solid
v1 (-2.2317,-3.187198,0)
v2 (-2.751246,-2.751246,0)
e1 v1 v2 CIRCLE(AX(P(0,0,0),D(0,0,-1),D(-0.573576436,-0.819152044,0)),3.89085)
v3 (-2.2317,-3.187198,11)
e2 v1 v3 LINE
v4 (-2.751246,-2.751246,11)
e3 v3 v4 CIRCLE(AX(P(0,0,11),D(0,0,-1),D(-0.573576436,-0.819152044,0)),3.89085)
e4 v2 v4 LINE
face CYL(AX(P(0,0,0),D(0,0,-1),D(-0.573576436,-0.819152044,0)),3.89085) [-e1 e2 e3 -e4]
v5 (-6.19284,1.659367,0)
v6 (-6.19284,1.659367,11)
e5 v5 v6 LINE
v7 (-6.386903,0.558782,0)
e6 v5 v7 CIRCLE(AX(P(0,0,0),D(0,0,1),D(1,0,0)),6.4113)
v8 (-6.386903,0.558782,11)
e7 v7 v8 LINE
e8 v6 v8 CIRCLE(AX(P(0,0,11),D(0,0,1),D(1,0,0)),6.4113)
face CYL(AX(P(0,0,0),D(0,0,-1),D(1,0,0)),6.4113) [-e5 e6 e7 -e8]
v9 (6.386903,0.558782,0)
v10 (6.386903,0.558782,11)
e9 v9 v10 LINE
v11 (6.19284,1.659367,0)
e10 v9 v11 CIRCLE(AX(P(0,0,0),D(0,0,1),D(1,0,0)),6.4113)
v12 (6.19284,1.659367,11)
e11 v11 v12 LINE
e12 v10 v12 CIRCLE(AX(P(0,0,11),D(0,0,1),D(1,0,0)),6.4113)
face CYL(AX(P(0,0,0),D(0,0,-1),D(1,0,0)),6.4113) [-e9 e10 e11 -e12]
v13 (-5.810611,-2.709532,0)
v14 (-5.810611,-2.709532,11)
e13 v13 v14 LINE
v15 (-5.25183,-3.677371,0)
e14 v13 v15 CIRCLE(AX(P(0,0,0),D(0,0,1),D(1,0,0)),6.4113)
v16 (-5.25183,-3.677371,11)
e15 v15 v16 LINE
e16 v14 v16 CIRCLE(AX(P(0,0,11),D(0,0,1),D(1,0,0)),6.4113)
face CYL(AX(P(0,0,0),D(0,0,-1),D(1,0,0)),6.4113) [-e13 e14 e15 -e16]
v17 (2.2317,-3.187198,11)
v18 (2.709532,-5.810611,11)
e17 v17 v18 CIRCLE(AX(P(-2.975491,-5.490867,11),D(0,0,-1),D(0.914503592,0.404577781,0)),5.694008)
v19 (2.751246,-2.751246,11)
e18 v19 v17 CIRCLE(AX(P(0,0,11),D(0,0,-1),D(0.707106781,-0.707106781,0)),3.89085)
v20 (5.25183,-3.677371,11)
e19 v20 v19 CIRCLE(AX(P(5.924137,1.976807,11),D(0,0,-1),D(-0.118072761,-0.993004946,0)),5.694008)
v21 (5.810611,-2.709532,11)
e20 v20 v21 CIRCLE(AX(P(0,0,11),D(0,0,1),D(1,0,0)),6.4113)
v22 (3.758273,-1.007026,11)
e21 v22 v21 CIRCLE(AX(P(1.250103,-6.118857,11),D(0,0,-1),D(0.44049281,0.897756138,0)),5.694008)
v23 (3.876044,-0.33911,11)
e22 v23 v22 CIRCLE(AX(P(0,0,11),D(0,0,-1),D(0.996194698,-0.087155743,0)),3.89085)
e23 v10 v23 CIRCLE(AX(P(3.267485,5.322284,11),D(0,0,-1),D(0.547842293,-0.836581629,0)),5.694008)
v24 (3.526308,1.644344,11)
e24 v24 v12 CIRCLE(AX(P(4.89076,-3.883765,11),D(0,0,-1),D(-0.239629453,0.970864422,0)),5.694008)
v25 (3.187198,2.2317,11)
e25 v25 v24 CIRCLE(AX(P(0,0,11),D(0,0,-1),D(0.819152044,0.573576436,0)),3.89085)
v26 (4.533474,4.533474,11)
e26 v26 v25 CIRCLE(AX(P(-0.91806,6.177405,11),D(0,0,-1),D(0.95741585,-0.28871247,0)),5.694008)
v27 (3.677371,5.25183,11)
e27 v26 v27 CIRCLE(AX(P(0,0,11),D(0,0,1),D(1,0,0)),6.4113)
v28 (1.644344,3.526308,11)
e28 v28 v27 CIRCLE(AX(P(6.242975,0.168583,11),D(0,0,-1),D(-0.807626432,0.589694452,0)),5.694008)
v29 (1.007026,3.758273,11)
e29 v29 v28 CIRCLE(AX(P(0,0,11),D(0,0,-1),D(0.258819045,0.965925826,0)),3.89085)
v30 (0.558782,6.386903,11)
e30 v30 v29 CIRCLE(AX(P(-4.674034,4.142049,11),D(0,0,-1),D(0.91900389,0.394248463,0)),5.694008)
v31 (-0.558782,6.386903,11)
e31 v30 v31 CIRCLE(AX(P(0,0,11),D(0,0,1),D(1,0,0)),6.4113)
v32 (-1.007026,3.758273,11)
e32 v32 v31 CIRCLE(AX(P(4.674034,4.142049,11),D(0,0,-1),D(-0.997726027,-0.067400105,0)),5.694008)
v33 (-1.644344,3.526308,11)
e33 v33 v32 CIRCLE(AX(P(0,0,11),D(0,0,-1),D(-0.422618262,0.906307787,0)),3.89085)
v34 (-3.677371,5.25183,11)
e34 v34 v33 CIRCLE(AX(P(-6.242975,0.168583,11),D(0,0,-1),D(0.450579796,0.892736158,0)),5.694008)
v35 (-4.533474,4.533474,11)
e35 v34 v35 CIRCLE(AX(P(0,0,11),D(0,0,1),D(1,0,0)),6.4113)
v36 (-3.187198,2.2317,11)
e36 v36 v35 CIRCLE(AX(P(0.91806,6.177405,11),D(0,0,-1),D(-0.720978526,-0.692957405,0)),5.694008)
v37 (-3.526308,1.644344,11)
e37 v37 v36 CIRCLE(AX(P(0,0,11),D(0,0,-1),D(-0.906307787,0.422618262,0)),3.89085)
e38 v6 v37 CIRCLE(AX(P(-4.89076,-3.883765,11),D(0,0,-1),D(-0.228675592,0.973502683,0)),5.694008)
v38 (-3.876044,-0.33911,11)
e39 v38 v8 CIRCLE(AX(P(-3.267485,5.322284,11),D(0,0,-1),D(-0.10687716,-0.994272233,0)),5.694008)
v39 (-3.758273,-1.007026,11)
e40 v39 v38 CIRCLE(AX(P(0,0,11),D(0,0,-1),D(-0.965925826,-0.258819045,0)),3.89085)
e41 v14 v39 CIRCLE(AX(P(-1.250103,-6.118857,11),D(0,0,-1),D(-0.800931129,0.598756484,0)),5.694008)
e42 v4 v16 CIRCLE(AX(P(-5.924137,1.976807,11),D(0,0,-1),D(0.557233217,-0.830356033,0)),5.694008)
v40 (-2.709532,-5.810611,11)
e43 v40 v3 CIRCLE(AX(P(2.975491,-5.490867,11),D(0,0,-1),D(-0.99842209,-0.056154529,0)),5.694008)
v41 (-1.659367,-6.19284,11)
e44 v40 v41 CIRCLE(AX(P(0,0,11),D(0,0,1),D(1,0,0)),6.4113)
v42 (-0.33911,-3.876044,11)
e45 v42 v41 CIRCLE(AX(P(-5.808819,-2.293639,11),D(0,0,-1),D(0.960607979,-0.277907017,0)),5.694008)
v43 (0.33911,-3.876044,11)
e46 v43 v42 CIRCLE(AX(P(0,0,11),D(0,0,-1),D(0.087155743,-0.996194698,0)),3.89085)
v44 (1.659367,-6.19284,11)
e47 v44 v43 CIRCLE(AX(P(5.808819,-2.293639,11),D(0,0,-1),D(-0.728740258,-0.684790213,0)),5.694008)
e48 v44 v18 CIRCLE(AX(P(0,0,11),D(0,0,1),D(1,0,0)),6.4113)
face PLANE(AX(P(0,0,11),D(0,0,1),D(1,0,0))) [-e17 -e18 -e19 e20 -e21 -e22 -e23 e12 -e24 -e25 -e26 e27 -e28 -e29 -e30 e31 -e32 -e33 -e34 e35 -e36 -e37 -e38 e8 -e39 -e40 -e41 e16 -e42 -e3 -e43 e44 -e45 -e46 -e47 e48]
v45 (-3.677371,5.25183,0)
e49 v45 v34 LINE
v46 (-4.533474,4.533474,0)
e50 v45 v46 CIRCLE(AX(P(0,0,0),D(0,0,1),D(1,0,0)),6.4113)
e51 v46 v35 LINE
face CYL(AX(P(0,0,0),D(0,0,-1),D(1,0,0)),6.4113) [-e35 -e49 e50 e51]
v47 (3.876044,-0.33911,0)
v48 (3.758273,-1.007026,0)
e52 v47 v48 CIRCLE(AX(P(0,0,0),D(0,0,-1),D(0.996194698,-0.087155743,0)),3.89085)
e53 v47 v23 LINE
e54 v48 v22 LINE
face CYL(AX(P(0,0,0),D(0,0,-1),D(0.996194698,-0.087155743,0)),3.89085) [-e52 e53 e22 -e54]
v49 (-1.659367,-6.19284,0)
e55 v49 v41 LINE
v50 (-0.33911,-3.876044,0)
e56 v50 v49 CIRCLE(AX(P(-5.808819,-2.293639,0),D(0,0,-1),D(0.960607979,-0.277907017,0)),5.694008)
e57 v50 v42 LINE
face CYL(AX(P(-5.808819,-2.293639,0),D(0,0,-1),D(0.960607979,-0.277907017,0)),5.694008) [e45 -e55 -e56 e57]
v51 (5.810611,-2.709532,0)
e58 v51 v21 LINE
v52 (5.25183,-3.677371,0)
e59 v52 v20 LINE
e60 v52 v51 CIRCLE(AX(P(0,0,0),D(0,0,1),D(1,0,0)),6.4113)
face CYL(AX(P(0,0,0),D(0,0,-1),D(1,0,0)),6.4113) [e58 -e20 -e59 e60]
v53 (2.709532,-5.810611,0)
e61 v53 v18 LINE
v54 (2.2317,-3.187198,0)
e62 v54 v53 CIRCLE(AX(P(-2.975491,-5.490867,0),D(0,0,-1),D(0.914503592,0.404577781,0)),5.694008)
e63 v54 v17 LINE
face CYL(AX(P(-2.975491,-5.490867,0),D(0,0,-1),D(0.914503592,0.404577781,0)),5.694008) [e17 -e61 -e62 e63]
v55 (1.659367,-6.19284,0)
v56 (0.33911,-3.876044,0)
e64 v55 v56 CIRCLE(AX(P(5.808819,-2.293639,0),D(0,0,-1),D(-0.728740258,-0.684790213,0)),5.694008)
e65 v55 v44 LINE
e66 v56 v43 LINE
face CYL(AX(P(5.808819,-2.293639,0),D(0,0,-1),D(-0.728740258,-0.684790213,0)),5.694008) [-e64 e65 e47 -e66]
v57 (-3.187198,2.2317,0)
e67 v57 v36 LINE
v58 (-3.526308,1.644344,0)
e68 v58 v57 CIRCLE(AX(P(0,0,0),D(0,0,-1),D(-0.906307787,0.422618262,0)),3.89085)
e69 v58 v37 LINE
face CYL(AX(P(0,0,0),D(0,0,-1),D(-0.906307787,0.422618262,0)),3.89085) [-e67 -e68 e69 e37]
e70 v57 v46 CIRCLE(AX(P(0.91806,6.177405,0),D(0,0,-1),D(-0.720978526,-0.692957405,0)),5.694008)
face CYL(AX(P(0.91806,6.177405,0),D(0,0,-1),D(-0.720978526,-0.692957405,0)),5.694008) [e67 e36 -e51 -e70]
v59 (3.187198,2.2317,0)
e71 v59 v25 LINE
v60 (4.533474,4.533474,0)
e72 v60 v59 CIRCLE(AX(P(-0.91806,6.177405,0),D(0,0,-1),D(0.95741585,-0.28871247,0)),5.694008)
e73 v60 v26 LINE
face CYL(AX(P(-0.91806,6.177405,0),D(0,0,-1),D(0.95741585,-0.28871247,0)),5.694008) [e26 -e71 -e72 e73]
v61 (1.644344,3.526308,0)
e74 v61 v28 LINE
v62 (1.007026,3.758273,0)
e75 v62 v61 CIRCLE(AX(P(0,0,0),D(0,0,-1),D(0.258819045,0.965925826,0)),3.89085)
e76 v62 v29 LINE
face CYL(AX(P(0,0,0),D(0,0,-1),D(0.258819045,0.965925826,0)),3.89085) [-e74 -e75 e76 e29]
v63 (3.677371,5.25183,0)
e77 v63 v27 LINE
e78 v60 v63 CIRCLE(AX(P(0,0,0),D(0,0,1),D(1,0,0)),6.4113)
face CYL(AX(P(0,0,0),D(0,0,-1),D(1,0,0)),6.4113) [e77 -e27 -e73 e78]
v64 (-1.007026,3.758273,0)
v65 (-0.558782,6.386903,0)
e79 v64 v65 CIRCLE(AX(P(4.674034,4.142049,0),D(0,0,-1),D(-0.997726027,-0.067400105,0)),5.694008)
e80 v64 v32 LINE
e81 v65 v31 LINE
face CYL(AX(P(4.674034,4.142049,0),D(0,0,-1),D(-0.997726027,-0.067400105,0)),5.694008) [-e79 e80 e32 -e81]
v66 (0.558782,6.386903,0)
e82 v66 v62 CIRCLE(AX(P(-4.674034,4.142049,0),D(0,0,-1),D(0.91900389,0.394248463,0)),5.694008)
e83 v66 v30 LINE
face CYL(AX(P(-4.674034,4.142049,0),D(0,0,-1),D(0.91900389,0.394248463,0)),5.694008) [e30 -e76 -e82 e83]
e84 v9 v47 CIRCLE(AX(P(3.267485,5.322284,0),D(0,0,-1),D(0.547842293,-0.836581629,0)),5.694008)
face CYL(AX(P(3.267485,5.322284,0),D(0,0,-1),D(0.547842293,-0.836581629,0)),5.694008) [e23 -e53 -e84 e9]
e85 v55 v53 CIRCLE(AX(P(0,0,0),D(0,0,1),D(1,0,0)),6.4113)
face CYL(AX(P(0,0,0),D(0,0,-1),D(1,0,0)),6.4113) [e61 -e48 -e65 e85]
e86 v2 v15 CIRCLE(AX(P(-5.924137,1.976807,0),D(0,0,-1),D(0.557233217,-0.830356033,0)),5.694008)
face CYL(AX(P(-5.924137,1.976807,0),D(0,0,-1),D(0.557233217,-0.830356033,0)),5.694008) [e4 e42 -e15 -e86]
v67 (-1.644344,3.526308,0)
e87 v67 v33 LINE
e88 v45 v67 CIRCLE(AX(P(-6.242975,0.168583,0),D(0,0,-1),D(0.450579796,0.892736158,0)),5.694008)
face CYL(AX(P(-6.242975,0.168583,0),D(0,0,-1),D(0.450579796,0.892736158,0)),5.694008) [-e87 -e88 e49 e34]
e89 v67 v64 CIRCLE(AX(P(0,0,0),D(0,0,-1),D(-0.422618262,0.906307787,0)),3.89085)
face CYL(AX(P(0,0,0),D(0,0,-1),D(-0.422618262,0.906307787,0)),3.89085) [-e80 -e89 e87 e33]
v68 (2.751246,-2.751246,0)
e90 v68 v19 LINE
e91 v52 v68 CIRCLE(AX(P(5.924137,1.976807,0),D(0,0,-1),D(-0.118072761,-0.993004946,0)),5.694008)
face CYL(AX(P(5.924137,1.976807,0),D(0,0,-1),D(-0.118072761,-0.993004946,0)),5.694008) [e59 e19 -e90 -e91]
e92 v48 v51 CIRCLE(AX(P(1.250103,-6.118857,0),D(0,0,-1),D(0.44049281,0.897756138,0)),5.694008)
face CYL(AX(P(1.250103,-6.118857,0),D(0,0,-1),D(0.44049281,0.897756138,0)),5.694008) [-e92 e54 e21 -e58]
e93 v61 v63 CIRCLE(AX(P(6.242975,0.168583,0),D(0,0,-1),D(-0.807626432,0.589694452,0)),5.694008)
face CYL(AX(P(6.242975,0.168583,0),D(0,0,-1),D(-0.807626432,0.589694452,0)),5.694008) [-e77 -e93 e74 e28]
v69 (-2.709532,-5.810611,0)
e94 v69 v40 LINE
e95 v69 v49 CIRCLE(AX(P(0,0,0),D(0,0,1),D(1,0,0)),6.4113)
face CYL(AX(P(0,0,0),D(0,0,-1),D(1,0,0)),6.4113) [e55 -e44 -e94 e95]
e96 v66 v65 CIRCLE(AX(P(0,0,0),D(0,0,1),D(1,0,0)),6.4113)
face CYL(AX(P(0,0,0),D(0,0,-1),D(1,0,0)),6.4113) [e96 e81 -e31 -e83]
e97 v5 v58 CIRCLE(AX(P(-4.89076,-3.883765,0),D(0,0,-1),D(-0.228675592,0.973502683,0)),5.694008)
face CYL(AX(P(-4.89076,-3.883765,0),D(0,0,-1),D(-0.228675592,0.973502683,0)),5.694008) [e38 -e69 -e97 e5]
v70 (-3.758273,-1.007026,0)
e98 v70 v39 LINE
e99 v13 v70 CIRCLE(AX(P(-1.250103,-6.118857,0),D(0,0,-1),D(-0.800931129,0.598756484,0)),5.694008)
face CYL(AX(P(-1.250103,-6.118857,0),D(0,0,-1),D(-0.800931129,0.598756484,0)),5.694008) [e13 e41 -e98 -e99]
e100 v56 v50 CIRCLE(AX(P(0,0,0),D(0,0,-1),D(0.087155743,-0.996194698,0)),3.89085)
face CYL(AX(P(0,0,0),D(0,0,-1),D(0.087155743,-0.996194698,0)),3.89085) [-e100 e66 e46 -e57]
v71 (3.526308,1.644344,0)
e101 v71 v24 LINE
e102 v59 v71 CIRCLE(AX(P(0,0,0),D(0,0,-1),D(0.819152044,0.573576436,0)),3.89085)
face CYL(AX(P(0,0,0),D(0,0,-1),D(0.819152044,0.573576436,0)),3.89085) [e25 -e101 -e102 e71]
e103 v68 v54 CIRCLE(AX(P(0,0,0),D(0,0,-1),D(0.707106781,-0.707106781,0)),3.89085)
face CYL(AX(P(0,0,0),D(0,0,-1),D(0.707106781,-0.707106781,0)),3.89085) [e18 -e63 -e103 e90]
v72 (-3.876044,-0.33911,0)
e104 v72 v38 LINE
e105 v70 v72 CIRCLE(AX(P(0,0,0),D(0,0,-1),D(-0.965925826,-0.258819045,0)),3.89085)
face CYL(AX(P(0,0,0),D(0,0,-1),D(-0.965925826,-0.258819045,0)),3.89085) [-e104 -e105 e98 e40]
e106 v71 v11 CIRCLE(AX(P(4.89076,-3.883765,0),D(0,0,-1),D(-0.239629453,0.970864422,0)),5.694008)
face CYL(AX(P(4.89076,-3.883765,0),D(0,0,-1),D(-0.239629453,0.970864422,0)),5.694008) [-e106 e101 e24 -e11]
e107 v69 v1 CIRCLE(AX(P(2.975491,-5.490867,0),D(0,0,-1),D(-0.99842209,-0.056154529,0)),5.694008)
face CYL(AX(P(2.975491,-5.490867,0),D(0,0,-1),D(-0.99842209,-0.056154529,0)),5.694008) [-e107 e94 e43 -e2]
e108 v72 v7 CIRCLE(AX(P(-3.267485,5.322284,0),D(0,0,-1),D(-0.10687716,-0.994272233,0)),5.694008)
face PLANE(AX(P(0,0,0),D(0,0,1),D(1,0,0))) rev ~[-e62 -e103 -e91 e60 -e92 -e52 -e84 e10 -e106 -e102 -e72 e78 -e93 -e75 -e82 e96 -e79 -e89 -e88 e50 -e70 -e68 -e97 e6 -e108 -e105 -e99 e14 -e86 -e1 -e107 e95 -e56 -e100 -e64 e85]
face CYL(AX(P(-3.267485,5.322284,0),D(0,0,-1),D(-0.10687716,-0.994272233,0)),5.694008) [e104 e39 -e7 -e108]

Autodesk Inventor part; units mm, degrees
sketch "Sketch1" plane through (0, 0, 0) normal (0, 0, 1) x (1, 0, 0)
  circle A0 centre (0, 0) radius 6.4113
  dimension "d0" = 12.8226
extrude "Extrusion1" add sketch "Sketch1" along normal blind 11
ref_plane "Work Plane2" through (0, 0, 5.5) normal (0, 0, 1) x (1, 0, 0)
sketch "Sketch2" plane through (0, 0, 0) normal (0, 0, -1) x (-1, 0, 0)
  circle A0 centre (0, 0) radius 6.4113 projected
  circle A1 centre (0, 0) radius 5.15
  dimension "d3" = 10.3
surface extrude "Pitch Diameter" sketch "Sketch2" against normal through all shown no curves A1
ref_plane "Work Plane8" through (0, 0, 0) normal (0.9396926, 0.3420201, 0) x (0, 0, 1)
ref_plane "Work Plane9" through (0, 0, 0) normal (1, 0, 0) x (0, 1, 0)
spur gear teeth "Spur Gear" teeth 9 pitch diameter 10.125 tip diameter 12.8226 root diameter 7.7817 face width 11 start plane through (0, 0, 0) normal (0, 0, -1) x (-1, 0, 0)
equation "\"d0\" = da_da"
equation "\"d1\" = da_b"
equation "\"d3\" = da_dw"
equation "\"d16\" = da_aw"
equation "\"d43\" = da_aw"
equation "\"d46\" = da_aw"
equation "\"da_da\" = 12.822612"
equation "\"da_b\" = 11"
equation "\"da_dw\" = 10.3"
equation "\"da_aw\" = 10.3"
properties part number "Spur Gear2" material "Steel"
